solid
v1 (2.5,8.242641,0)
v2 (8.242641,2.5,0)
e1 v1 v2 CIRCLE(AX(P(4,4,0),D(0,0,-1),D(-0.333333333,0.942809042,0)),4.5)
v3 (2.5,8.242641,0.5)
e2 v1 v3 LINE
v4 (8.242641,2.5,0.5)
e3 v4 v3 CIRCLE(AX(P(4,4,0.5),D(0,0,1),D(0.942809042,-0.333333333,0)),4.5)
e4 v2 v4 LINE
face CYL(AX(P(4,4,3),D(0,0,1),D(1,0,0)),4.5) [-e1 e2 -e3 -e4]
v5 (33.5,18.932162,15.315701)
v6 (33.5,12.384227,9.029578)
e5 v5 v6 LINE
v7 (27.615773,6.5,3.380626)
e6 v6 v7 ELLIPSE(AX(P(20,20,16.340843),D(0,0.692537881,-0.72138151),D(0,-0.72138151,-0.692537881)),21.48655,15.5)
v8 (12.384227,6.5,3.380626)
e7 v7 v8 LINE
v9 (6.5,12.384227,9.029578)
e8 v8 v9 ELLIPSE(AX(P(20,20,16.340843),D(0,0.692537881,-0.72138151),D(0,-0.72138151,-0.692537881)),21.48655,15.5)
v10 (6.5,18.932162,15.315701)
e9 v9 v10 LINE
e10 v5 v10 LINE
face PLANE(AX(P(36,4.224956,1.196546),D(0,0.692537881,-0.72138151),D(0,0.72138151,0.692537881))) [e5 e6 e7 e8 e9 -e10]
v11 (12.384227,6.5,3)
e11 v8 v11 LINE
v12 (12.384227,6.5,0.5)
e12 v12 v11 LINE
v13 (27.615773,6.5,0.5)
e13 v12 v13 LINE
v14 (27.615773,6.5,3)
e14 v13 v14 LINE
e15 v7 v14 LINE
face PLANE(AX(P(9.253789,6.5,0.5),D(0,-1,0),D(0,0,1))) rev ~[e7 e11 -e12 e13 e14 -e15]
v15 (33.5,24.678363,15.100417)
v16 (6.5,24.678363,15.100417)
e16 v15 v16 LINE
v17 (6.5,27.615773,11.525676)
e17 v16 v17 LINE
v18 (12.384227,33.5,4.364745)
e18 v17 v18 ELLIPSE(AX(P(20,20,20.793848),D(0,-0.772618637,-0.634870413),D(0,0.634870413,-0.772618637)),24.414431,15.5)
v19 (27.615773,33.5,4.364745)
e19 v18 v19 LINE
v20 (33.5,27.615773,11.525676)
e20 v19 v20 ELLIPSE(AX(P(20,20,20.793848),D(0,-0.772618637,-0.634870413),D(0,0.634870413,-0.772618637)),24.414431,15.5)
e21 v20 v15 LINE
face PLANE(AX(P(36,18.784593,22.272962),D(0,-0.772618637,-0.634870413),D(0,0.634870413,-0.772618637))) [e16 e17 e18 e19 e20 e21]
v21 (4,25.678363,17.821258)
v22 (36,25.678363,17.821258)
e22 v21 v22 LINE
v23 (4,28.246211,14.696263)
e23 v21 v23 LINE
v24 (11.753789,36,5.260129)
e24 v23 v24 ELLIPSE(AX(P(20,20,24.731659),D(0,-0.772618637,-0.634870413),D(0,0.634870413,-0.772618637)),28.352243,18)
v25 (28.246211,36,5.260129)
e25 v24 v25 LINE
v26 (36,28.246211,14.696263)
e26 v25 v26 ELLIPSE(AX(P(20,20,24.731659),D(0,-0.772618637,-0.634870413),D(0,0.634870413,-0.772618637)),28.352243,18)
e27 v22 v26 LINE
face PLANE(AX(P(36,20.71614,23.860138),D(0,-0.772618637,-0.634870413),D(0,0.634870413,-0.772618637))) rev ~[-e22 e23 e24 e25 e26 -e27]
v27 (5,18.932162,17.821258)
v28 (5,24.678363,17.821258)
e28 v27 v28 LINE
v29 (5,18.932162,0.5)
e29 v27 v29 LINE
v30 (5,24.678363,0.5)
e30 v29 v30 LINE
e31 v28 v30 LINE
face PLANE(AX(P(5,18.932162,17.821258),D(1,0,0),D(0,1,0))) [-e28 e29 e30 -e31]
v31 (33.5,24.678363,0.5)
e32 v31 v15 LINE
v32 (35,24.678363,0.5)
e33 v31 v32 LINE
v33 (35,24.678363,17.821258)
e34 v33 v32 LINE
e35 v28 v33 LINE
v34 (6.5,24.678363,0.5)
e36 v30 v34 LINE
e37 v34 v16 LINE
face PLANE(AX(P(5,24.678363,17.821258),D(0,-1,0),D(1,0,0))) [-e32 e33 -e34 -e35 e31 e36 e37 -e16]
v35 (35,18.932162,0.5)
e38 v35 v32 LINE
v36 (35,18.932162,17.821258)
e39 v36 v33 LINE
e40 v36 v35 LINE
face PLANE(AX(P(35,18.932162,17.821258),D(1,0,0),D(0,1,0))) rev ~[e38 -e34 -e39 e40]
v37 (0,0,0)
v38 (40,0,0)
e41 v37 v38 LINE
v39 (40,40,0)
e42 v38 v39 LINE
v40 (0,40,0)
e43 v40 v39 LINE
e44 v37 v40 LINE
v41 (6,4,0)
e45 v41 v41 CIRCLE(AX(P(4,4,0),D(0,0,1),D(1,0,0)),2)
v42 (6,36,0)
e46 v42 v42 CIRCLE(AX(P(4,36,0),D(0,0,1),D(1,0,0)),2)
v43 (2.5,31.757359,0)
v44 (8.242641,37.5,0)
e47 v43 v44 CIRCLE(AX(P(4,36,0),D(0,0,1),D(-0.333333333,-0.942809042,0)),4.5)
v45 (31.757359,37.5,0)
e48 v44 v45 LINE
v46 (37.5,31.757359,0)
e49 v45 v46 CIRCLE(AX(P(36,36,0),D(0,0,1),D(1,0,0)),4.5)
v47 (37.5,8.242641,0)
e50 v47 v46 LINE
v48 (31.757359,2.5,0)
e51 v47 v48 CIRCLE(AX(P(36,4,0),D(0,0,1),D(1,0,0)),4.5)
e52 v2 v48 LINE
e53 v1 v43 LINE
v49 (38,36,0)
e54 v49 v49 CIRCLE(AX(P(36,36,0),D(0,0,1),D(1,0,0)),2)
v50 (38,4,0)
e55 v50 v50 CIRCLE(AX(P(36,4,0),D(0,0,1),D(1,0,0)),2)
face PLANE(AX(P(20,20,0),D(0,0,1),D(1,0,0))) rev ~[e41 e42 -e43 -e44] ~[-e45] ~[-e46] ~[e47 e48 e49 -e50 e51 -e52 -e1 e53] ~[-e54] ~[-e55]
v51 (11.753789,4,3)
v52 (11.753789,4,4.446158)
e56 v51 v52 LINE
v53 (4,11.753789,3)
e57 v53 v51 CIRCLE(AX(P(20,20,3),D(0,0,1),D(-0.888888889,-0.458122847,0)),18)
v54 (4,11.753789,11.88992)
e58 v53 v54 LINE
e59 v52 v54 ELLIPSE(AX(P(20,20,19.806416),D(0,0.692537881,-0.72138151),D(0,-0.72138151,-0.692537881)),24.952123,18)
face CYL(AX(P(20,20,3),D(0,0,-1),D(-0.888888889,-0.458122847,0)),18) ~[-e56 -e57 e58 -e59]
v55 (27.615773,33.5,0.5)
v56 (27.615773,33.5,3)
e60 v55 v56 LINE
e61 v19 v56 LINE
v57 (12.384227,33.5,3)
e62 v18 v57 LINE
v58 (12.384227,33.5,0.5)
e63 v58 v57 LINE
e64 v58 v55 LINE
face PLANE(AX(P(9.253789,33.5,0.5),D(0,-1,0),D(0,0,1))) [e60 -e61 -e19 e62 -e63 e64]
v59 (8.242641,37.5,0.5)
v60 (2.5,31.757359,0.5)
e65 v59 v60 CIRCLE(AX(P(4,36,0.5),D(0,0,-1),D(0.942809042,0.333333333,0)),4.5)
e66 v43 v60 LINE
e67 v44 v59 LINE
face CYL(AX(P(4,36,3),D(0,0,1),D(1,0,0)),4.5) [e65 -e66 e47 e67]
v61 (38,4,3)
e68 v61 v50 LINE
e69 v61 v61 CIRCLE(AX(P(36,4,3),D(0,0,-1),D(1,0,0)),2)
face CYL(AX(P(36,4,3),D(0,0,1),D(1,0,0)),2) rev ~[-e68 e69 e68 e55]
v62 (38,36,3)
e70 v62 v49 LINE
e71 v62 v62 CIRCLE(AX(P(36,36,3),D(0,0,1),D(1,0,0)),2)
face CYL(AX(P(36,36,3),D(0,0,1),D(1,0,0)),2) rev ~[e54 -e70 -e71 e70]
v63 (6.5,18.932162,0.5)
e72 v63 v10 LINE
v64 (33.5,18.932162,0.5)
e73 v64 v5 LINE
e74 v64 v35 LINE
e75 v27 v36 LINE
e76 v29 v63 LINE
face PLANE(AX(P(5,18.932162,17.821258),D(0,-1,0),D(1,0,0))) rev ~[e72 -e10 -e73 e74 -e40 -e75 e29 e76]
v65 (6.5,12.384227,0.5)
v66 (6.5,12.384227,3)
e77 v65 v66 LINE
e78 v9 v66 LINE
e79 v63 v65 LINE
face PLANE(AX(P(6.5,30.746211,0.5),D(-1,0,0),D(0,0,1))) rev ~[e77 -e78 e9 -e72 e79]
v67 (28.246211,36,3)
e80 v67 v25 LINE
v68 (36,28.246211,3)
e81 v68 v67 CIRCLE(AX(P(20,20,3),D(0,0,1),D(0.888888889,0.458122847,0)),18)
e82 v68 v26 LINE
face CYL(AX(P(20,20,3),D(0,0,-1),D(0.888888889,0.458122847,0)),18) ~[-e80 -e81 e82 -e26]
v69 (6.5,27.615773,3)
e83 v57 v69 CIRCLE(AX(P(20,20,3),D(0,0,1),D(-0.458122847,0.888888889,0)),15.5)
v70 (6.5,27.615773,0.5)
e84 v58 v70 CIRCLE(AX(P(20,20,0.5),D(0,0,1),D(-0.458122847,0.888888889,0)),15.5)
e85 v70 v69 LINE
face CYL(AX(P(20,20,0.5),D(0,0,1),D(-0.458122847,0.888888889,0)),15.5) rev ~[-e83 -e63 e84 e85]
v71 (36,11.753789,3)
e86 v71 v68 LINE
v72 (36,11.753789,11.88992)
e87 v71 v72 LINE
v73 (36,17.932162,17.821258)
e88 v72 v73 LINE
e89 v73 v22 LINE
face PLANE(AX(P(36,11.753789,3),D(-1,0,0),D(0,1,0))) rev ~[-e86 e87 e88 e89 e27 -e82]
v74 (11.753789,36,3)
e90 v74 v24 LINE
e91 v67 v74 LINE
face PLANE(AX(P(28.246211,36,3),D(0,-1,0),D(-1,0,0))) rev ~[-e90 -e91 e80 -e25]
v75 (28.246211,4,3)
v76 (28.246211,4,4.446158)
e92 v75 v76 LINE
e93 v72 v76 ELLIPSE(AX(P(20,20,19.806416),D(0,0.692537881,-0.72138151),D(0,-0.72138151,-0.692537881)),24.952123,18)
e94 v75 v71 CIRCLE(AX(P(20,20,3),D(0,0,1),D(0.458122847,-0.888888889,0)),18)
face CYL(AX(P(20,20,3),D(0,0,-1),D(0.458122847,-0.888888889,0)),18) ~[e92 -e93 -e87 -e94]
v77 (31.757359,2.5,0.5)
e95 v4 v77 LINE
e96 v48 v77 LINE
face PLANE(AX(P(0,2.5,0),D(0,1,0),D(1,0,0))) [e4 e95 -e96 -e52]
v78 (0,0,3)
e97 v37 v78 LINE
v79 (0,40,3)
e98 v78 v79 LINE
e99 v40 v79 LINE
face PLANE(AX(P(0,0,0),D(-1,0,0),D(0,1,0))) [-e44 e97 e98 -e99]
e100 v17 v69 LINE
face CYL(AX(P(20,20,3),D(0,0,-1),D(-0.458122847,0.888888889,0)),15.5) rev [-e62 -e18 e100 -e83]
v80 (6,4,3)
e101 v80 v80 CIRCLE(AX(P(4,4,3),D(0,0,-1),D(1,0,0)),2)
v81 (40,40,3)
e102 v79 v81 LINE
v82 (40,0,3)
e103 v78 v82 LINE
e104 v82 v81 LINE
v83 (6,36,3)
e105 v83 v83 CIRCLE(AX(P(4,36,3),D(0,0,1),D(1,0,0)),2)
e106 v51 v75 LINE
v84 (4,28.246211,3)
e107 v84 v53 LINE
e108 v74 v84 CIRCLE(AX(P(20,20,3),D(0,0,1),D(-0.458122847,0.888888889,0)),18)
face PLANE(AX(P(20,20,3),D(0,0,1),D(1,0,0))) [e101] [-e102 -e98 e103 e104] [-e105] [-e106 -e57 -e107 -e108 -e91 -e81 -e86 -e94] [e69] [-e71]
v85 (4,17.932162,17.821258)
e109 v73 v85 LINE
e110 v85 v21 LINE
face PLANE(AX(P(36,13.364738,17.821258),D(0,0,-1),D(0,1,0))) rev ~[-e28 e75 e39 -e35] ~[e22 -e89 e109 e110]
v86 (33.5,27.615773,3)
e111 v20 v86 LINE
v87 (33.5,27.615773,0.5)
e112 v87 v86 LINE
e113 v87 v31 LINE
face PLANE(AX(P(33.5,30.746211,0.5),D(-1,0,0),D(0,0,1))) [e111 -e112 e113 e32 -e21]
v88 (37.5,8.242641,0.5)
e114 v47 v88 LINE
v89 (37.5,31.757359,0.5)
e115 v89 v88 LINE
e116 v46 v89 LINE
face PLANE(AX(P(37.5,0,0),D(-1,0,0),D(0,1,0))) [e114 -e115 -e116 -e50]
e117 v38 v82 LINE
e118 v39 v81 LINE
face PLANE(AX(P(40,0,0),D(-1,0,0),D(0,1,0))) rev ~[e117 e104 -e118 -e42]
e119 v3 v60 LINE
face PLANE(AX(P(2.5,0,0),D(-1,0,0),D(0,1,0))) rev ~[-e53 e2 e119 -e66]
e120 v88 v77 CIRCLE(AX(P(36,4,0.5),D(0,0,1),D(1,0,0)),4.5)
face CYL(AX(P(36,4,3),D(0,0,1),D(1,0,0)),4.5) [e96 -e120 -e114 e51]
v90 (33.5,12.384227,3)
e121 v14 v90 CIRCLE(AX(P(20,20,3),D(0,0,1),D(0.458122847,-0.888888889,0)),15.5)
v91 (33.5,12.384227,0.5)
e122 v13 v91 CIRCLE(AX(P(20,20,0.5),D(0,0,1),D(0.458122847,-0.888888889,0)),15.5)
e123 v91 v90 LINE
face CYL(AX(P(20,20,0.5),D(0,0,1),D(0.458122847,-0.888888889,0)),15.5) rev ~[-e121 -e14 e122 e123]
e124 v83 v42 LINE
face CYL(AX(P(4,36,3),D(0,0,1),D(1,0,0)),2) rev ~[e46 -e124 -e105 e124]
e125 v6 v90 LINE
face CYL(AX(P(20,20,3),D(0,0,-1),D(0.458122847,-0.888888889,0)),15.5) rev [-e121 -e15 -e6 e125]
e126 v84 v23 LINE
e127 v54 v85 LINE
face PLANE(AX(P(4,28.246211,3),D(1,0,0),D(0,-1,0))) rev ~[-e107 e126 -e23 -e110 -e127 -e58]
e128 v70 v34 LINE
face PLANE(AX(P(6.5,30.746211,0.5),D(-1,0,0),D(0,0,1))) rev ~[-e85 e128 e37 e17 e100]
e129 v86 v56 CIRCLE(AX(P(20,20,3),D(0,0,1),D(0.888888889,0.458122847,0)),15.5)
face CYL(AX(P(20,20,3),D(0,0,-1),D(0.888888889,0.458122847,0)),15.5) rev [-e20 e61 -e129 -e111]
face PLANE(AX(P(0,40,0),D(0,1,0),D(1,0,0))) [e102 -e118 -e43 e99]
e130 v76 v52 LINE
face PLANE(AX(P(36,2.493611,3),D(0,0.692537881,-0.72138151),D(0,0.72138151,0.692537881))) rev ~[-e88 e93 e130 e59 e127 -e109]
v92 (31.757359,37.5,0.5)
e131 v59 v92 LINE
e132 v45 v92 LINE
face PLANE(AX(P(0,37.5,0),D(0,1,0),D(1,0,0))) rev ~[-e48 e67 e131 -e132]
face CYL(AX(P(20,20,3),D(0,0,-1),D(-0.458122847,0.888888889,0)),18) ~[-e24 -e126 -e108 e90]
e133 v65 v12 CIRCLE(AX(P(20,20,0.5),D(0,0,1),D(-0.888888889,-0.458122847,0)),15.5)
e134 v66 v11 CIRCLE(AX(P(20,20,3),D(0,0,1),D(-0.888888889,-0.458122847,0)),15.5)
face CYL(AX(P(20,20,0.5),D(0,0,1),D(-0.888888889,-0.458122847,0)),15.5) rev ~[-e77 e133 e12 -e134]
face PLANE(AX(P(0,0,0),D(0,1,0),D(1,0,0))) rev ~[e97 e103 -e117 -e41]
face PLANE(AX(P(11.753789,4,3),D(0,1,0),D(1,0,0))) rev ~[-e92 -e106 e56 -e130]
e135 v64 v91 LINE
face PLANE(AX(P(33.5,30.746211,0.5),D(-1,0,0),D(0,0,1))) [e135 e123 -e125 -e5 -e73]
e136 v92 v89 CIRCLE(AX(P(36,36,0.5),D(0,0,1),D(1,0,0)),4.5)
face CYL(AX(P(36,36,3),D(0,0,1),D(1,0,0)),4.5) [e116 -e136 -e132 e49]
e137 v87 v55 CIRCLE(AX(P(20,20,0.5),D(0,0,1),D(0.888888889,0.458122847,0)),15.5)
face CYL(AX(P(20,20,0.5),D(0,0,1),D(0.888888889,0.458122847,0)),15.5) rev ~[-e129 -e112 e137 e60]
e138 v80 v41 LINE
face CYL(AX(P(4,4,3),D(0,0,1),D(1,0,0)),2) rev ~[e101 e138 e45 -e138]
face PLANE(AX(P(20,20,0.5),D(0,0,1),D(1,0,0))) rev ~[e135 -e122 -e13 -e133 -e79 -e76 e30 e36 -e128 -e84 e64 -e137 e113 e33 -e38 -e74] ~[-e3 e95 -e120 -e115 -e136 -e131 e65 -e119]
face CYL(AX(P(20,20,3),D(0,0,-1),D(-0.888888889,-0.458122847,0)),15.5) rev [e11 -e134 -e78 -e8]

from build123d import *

# Parameters (mm, degrees)
F0_W          = 40
F0_H          = 40
F1_DEPTH      = 3
F2_R          = 2
F3_DEPTH      = 25
F5_DEPTH      = 30
F7_DEPTH      = 36.001
F9_DEPTH      = 36.001
F11_DEPTH     = 36.001
F12_T         = 2.5
F12_T3_DEPTH  = 21.4924225025
F12_T5_DEPTH  = 21.4924225025
F12_T8_ANGLE  = 35.4679110995
F12_T10_ANGLE = 35.4679110995
F12_T12_ANGLE = 35.4679110995
F12_T14_ANGLE = 35.4679110995
F13_W         = 30
F13_H         = 5.7462014769
F14_DEPTH     = 25


# Not quite as in the source:
# - a shell that OpenCascade refuses in one call is made with other operations: the cavity is built on its own and cut out


with BuildPart() as f1:
    # F0 (on Top) → F1 (new body)
    with BuildSketch(Plane.XY):
        with Locations((20, 20)):
            Rectangle(F0_W, F0_H)
    extrude(amount=F1_DEPTH)

    # F2 (on face) → F3 (cut)
    with BuildSketch(Plane.XY.offset(3)):
        with Locations((4, 36)):
            Circle(F2_R)
        with Locations((36, 36)):
            Circle(F2_R)
        with Locations((36, 4)):
            Circle(F2_R)
        with Locations((4, 4)):
            Circle(F2_R)
    extrude(amount=-F3_DEPTH, mode=Mode.SUBTRACT)

    # F4 (on face) → F5 (join)
    with BuildSketch(Plane.XY.offset(3)):
        with BuildLine():
            Line((28.2462112512, 36), (11.7537887488, 36))
            ThreePointArc((11.7537887488, 36), (7.2720779386, 32.7279220614), (4, 28.2462112512))
            Line((4, 28.2462112512), (4, 11.7537887488))
            ThreePointArc((4, 11.7537887488), (7.2720779386, 7.2720779386), (11.7537887488, 4))
            Line((11.7537887488, 4), (28.2462112512, 4))
            ThreePointArc((28.2462112512, 4), (32.7279220614, 7.2720779386), (36, 11.7537887488))
            Line((36, 11.7537887488), (36, 28.2462112512))
            ThreePointArc((36, 28.2462112512), (32.7279220614, 32.7279220614), (28.2462112512, 36))
        make_face()
    extrude(amount=F5_DEPTH)

    # F6 (on face) → F7 (cut, through all)
    with BuildSketch(Plane.YZ.offset(36)):
        Polygon((2.4936108384, 3), (39.5666994154, 38.5907627642), (48.4694316983, 41.8781600893), (2.4936108384, 41.8781600893), align=None)
    extrude(amount=-F7_DEPTH, mode=Mode.SUBTRACT)

    # F8 (on face) → F9 (cut, through all)
    with BuildSketch(Plane.YZ.offset(36)):
        Polygon((20.7161400467, 23.8601379097), (36.8017591536, 4.2844121344), (40.8149436116, 38.1976142526), (20.7161400467, 38.1976142526), align=None)
    extrude(amount=-F9_DEPTH, mode=Mode.SUBTRACT)

    # F10 (on face) → F11 (cut, through all)
    with BuildSketch(Plane.YZ.offset(36)):
        Polygon((13.3647378534, 17.821257934), (36.5101168772, 17.821257934), (38.6116616428, 31.5769352019), (13.3647378534, 31.5769352019), align=None)
    extrude(amount=-F11_DEPTH, mode=Mode.SUBTRACT)

    # F12: shell of thickness 2.5, made by hand


with BuildPart() as f12_core1:
    # F12_t2: copy of F1
    add(f1.part)

    # the walls: a layer under each face that stays
    f12_faces = [f12_core1.faces().sort_by_distance(p)[0] for p in [
        (0, 20, 1.5),
        (20, 40, 1.5),
        (20, 0, 1.5),
        (6.6666666667, 6.6666666667, 3),
        (40, 20, 1.5),
        (2, 4, 1.5),
        (34, 4, 1.5),
        (2, 36, 1.5),
        (34, 36, 1.5),
        (36, 20, 10.410628967),
        (32.7279220614, 7.2720779386, 7.444960048),
        (32.7279220614, 32.7279220614, 8.8481312629),
        (20, 4, 3.7230789413),
        (20, 36, 4.1300647323),
        (7.2720779386, 7.2720779386, 7.444960048),
        (7.2720779386, 32.7279220614, 8.8481312629),
        (4, 20, 10.410628967),
        (20, 30.8391816878, 11.5406936993),
        (20, 21.8052626371, 17.821257934),
        (20, 10.9660809493, 11.1337079083),
    ]]
    thicken(f12_faces, amount=-F12_T, mode=Mode.SUBTRACT)

    # F12_s4 → F12_t3 (cut)
    with BuildSketch(Plane.XZ.offset(-30.7462112512)):
        Polygon((36.025, 3.025), (36, 0.5), (33.5, 0.5), (33.5, 3), align=None)
        Polygon((3.975, 3.025), (4, 0.5), (6.5, 0.5), (6.5, 3), align=None)
    extrude(amount=F12_T3_DEPTH, mode=Mode.SUBTRACT)

    # F12_s6 → F12_t5 (cut)
    with BuildSketch(Plane.YZ.offset(9.2537887488)):
        Polygon((3.975, 3.025), (4, 0.5), (6.5, 0.5), (6.5, 3), align=None)
        Polygon((36.025, 3.025), (36, 0.5), (33.5, 0.5), (33.5, 3), align=None)
    extrude(amount=F12_T5_DEPTH, mode=Mode.SUBTRACT)

    # F12_s7 → F12_t8 (revolve, cut)
    with BuildSketch(Plane(origin=(23.9468753099, 12.3419370383, 0), x_dir=(0, 0, 1), z_dir=(-0.8888888889, -0.4581228473, 0))):
        Polygon((3.025, -9.409679168), (0.5, -9.384679168), (0.5, -6.884679168), (3, -6.884679168), align=None)
    revolve(axis=Axis((20, 20, 3), (0, 0, 1)), revolution_arc=F12_T8_ANGLE, mode=Mode.SUBTRACT)

    # F12_s9 → F12_t10 (revolve, cut)
    with BuildSketch(Plane(origin=(-3.9468753099, 7.6580629617, 0), x_dir=(0, 0, 1), z_dir=(0.4581228473, -0.8888888889, 0))):
        Polygon((3.025, -44.9652347236), (0.5, -44.9402347236), (0.5, -42.4402347236), (3, -42.4402347236), align=None)
    revolve(axis=Axis((20, 20, 3), (0, 0, 1)), revolution_arc=F12_T10_ANGLE, mode=Mode.SUBTRACT)

    # F12_s11 → F12_t12 (revolve, cut)
    with BuildSketch(Plane(origin=(-3.9468753099, 7.6580629617, 0), x_dir=(0, 0, 1), z_dir=(-0.4581228473, 0.8888888889, 0))):
        Polygon((3.025, 8.9152347236), (0.5, 8.9402347236), (0.5, 11.4402347236), (3, 11.4402347236), align=None)
    revolve(axis=Axis((20, 20, 3), (0, 0, 1)), revolution_arc=F12_T12_ANGLE, mode=Mode.SUBTRACT)

    # F12_s13 → F12_t14 (revolve, cut)
    with BuildSketch(Plane(origin=(23.9468753099, 12.3419370383, 0), x_dir=(0, 0, 1), z_dir=(0.8888888889, 0.4581228473, 0))):
        Polygon((3.025, -26.640320832), (0.5, -26.615320832), (0.5, -24.115320832), (3, -24.115320832), align=None)
    revolve(axis=Axis((20, 20, 3), (0, 0, 1)), revolution_arc=F12_T14_ANGLE, mode=Mode.SUBTRACT)


with BuildPart() as f1_1:
    add(f1.part)

    # what is left inside the walls is the cavity
    f12_cavity = [f12_core1.part.solids().sort_by_distance(p)[0] for p in [
        (20, 14.166667, 0.025),
    ]]
    add(f12_cavity, mode=Mode.SUBTRACT)

    # F13 (on face) → F14 (cut)
    with BuildSketch(Plane.XY.offset(17.821257934)):
        with Locations((20, 21.8052626371)):
            Rectangle(F13_W, F13_H)
    extrude(amount=-F14_DEPTH, mode=Mode.SUBTRACT)


solid = f1_1.part
